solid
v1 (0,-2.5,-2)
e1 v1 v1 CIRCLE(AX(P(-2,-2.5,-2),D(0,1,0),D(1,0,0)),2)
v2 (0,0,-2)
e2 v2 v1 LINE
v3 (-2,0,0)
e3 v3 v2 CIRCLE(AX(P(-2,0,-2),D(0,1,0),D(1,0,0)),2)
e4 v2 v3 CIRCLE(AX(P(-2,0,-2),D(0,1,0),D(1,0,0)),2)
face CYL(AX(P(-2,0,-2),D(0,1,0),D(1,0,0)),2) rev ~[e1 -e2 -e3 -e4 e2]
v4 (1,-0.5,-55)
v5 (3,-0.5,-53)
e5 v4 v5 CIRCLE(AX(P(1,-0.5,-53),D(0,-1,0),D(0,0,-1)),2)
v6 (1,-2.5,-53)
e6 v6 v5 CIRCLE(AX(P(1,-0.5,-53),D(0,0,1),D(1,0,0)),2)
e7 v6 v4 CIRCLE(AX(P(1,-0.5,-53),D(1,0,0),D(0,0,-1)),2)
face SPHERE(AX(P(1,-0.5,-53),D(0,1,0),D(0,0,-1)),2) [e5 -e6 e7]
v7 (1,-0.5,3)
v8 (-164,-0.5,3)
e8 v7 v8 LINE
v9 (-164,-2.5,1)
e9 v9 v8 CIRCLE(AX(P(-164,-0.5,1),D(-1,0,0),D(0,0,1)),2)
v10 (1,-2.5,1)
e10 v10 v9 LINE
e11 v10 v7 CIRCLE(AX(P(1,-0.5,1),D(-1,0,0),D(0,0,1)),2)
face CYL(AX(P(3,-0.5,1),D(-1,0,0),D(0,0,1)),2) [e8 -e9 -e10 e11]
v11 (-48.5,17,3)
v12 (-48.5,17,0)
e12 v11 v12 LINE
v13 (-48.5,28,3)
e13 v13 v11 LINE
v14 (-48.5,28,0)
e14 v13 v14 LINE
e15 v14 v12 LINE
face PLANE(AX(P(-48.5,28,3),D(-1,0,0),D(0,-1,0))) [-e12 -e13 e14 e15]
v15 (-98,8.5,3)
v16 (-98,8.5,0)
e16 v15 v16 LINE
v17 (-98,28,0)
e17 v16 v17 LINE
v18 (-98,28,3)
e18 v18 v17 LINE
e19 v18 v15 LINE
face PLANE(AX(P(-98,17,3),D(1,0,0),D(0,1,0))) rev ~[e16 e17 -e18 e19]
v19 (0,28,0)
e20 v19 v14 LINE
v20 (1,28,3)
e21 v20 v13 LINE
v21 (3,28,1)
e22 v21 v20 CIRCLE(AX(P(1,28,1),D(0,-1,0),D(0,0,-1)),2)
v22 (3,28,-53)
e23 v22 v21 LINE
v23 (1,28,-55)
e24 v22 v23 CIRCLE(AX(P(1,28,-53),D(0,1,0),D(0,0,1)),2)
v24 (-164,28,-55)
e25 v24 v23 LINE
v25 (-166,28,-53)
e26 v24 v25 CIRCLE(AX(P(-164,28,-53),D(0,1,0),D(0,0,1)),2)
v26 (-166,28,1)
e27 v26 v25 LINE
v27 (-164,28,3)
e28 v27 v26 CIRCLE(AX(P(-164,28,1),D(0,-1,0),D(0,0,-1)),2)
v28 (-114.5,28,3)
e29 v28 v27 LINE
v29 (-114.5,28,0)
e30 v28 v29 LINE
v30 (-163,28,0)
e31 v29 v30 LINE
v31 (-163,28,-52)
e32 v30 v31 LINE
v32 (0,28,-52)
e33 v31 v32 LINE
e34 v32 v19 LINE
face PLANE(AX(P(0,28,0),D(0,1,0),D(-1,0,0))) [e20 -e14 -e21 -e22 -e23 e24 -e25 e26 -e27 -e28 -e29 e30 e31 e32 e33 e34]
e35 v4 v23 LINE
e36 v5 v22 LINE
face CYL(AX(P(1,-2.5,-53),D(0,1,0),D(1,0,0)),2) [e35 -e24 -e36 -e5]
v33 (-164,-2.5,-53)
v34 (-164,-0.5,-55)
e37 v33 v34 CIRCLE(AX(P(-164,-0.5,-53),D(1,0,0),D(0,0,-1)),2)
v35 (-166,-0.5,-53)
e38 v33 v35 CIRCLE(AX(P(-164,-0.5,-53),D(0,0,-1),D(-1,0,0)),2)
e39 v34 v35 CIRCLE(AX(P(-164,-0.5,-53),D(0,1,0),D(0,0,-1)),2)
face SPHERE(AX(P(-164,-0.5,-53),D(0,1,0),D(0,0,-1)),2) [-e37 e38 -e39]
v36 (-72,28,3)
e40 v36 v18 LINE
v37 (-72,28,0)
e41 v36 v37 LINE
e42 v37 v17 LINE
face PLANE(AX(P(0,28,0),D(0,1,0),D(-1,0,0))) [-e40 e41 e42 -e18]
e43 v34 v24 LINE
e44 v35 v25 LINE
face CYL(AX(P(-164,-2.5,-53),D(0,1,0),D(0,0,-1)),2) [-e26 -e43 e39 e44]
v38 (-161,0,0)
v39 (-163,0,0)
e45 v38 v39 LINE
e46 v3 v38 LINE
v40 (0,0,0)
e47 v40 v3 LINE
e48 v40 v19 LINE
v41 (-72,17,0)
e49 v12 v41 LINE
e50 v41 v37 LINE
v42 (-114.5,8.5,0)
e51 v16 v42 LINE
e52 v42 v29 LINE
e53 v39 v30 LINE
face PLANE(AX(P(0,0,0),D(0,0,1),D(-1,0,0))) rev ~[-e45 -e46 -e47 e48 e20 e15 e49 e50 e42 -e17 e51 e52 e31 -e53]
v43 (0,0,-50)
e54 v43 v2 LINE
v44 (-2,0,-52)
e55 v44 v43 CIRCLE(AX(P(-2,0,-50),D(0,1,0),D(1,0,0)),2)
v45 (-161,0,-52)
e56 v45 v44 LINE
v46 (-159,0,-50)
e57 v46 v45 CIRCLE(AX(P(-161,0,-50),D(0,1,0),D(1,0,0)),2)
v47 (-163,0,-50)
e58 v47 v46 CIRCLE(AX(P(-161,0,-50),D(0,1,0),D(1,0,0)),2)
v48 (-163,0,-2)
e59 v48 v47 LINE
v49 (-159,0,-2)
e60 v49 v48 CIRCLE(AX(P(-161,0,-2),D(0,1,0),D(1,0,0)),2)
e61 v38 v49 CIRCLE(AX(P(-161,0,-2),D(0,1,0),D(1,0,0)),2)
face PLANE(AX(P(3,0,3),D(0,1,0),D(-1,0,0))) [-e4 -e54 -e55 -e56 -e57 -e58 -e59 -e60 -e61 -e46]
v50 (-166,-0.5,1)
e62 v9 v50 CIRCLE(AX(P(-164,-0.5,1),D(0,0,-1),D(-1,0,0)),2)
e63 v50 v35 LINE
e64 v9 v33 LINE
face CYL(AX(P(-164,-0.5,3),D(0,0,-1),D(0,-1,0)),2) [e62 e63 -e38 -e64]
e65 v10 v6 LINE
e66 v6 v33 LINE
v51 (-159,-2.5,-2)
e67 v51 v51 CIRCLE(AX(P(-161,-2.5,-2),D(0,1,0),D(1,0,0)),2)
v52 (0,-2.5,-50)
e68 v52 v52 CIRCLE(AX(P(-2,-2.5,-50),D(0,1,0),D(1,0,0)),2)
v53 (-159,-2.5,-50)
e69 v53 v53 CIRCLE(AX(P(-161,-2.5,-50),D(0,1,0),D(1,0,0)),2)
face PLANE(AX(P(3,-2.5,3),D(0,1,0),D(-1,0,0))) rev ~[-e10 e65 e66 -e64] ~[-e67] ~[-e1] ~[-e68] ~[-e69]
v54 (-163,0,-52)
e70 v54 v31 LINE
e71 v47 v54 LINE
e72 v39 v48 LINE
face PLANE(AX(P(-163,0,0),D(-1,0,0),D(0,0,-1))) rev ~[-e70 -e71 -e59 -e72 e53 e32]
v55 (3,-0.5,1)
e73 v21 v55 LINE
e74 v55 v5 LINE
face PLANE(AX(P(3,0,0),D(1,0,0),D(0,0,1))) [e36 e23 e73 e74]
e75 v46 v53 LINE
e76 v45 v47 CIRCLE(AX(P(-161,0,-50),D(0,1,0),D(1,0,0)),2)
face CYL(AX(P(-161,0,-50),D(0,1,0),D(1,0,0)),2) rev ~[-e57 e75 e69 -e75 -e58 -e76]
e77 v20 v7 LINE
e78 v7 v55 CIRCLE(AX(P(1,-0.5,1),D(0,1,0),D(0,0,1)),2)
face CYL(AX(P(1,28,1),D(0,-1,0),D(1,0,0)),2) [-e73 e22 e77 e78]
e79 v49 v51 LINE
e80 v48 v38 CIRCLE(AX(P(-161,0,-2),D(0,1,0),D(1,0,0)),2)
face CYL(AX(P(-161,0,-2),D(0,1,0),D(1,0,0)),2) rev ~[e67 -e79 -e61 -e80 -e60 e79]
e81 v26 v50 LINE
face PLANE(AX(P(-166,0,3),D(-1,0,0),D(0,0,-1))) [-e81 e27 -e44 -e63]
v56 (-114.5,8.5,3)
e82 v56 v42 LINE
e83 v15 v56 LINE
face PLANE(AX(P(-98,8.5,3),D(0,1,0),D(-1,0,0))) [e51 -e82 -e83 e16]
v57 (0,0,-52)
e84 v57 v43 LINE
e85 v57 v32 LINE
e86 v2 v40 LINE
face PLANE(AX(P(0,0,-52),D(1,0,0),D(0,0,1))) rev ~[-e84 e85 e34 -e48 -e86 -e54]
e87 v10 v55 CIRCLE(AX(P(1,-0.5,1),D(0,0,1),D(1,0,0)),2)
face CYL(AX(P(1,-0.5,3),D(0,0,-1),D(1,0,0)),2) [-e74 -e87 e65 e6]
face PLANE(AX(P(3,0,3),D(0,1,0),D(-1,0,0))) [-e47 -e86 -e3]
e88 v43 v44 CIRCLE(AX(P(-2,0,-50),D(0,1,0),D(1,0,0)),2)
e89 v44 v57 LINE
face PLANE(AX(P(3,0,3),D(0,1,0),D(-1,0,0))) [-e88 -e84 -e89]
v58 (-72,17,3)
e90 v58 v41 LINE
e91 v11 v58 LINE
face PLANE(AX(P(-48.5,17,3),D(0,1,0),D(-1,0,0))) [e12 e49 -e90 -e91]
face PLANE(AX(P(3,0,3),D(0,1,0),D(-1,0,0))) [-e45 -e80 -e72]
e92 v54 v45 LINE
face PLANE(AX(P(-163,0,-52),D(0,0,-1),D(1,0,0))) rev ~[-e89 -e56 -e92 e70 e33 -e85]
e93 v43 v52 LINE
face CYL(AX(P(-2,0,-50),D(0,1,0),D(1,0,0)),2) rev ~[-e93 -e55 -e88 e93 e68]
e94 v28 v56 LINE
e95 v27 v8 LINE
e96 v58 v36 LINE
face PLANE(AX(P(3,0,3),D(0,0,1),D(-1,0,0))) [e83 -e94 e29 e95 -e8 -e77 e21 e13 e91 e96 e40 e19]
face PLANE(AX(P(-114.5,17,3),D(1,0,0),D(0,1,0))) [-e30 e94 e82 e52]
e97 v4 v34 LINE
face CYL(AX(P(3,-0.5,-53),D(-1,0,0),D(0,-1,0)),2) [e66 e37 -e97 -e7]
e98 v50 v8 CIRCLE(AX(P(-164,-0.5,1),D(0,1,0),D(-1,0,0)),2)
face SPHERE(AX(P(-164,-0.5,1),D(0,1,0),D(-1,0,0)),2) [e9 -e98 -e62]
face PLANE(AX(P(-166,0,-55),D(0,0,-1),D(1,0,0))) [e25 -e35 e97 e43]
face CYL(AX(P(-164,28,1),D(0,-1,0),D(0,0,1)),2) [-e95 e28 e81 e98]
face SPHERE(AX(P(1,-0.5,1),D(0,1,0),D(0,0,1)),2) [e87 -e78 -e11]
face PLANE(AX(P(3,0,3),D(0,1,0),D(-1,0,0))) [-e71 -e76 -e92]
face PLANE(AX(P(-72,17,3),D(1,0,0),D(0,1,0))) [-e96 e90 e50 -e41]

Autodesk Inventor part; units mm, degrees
ref_plane "YZ Plane" through (0, 0, 0) normal (1, 0, 0) x (0, 1, 0)
ref_plane "XZ Plane" through (0, 0, 0) normal (0, 1, 0) x (-1, 0, 0)
ref_plane "XY Plane" through (0, 0, 0) normal (0, 0, 1) x (1, 0, 0)
sketch "Sketch1" plane through (0, 0, 0) normal (0, 1, 0) x (-1, 0, 0)
  line L0 (0, 0) -> (163, 0)
  line L1 (163, 0) -> (163, -52)
  line L2 (163, -52) -> (0, -52)
  line L3 (0, -52) -> (0, 0)
  line L4 (0, 0) -> (-3, 0)
  line L5 (-3, 0) -> (-3, 3)
  line L6 (-3, 3) -> (166, 3)
  line L7 (166, 3) -> (166, -55)
  line L8 (166, -55) -> (-3, -55)
  line L9 (-3, 0) -> (-3, -55)
  dimension "d0" = 163
  dimension "d1" = 52
  dimension "d2" = 3
  dimension "d3" = 3
  dimension "d4" = 169
  dimension "d5" = 58
  dimension "d6" = 169
extrude "Extrusion1" add sketch "Sketch1" along normal blind 28
sketch "Sketch2" plane through (-166, 0, 3) normal (0, 0, 1) x (1, 0, 0)
  line L0 (169, 0) -> (0, 0) projected
  line L1 (0, 0) -> (169, 0)
  line L2 (169, 0) -> (169, -2.5)
  line L3 (169, -2.5) -> (0, -2.5)
  line L4 (0, -2.5) -> (0, 0)
  point P0 (166, 0)
  dimension "d9" = 2.5
extrude "Extrusion2" add sketch "Sketch2" against normal blind 58
sketch "Sketch3" plane through (-166, 28, 3) normal (0, 0, 1) x (1, 0, 0)
  line L0 (94, 0) -> (117.5, 0)
  line L1 (117.5, 0) -> (117.5, -11)
  line L2 (117.5, -11) -> (94, -11)
  line L3 (94, -11) -> (94, 0)
  line L4 (169, -30.5) -> (169, 0) projected
  line L5 (0, -30.5) -> (0, 0) projected
  line L6 (166, -28) -> (3, -28) projected
  line L7 (0, 0) -> (169, 0) projected
  line L8 (51.5, -11) -> (68, -11)
  line L9 (68, -11) -> (68, -19.5)
  line L10 (68, -19.5) -> (51.5, -19.5)
  line L11 (51.5, -19.5) -> (51.5, -11)
  line L12 (51.5, -11) -> (68, -19.5) construction
  line L13 (68, -11) -> (51.5, -19.5) construction
  line L14 (0, -30.5) -> (169, -30.5) projected
  line L15 (51.5, -11) -> (51.5, 0)
  line L16 (68, -11) -> (68, 0)
  line L17 (51.5, 0) -> (68, 0)
  point P0 (59.75, -15.25)
  dimension "d12" = 75
  dimension "d13" = 117.5
  dimension "d14" = 17
  dimension "d15" = 0
  dimension "d16" = 23.5
  dimension "d17" = 16.5
  dimension "d18" = 8.5
  dimension "d19" = 30.5
  dimension "d20" = 15.25
  dimension "d21" = 51.5
  dimension "d22" = 51.5
extrude "Extrusion3" cut sketch "Sketch3" against normal blind 10 contours L0 L1 L2 L3 | L16 L8 L15 L7 | L9 L10 L11 L8
sketch "Sketch4" plane through (-166, -2.5, 3) normal (0, 0, 1) x (1, 0, 0)
  point P0 (166, 2.5)
sketch "Sketch5" plane through (-163, 0, -52) normal (0, 1, 0) x (1, 0, 0)
  circle A0 centre (161, -50) radius 2
  circle A1 centre (161, -2) radius 2
  circle A2 centre (2, -2) radius 2
  circle A3 centre (2, -50) radius 2
  point P0 (163, -52)
  dimension "d25" = 4
  dimension "d26" = 4
  dimension "d27" = 4
  dimension "d28" = 4
  dimension "d29" = 48
  dimension "d30" = 159
extrude "Extrusion4" cut sketch "Sketch5" against normal blind 10
fillet "Fillet1" radius 2 8 edges at (3, 12.75, 3) (3, 12.75, -55) (-166, 12.75, -55) (-166, 12.75, 3) (-81.5, -2.5, -55) (-166, -2.5, -26) (-81.5, -2.5, 3) (3, -2.5, -26)
sketch "Sketch6" plane through (-161, 0, -52) normal (0, 1, 0) x (1, 0, 0)
  line L0 (164, -53) -> (164, 1) projected
  line L1 (-5, 1) -> (-5, -53) projected
  line L2 (162, 3) -> (-3, 3) projected
  line L3 (112.5, -55) -> (162, -55) projected
  point P0 (161, -52)
  dimension "d34" = 169
  dimension "d35" = 58
sketch "Sketch7" plane through (-98, 28, 3) normal (0, 0, 1) x (1, 0, 0)
  line L0 (49.5, 0) -> (49.5, -11) projected
  line L1 (101, -28.5) -> (101, 0) projected
  line L2 (26, -11) -> (49.5, -11) projected
  line L3 (99, 0) -> (-66, 0) projected
  line L4 (-68, 0) -> (-68, -28.5) projected
  line L5 (-16.5, -19.5) -> (-16.5, 0) projected
  line L6 (0, -19.5) -> (-16.5, -19.5) projected
  line L7 (26, -11) -> (26, 0) projected
  point P0 (98, -28)
  dimension "d36" = 51.5
  dimension "d37" = 11
  dimension "d38" = 51.5
  dimension "d39" = 19.5
  dimension "d40" = 23.5
